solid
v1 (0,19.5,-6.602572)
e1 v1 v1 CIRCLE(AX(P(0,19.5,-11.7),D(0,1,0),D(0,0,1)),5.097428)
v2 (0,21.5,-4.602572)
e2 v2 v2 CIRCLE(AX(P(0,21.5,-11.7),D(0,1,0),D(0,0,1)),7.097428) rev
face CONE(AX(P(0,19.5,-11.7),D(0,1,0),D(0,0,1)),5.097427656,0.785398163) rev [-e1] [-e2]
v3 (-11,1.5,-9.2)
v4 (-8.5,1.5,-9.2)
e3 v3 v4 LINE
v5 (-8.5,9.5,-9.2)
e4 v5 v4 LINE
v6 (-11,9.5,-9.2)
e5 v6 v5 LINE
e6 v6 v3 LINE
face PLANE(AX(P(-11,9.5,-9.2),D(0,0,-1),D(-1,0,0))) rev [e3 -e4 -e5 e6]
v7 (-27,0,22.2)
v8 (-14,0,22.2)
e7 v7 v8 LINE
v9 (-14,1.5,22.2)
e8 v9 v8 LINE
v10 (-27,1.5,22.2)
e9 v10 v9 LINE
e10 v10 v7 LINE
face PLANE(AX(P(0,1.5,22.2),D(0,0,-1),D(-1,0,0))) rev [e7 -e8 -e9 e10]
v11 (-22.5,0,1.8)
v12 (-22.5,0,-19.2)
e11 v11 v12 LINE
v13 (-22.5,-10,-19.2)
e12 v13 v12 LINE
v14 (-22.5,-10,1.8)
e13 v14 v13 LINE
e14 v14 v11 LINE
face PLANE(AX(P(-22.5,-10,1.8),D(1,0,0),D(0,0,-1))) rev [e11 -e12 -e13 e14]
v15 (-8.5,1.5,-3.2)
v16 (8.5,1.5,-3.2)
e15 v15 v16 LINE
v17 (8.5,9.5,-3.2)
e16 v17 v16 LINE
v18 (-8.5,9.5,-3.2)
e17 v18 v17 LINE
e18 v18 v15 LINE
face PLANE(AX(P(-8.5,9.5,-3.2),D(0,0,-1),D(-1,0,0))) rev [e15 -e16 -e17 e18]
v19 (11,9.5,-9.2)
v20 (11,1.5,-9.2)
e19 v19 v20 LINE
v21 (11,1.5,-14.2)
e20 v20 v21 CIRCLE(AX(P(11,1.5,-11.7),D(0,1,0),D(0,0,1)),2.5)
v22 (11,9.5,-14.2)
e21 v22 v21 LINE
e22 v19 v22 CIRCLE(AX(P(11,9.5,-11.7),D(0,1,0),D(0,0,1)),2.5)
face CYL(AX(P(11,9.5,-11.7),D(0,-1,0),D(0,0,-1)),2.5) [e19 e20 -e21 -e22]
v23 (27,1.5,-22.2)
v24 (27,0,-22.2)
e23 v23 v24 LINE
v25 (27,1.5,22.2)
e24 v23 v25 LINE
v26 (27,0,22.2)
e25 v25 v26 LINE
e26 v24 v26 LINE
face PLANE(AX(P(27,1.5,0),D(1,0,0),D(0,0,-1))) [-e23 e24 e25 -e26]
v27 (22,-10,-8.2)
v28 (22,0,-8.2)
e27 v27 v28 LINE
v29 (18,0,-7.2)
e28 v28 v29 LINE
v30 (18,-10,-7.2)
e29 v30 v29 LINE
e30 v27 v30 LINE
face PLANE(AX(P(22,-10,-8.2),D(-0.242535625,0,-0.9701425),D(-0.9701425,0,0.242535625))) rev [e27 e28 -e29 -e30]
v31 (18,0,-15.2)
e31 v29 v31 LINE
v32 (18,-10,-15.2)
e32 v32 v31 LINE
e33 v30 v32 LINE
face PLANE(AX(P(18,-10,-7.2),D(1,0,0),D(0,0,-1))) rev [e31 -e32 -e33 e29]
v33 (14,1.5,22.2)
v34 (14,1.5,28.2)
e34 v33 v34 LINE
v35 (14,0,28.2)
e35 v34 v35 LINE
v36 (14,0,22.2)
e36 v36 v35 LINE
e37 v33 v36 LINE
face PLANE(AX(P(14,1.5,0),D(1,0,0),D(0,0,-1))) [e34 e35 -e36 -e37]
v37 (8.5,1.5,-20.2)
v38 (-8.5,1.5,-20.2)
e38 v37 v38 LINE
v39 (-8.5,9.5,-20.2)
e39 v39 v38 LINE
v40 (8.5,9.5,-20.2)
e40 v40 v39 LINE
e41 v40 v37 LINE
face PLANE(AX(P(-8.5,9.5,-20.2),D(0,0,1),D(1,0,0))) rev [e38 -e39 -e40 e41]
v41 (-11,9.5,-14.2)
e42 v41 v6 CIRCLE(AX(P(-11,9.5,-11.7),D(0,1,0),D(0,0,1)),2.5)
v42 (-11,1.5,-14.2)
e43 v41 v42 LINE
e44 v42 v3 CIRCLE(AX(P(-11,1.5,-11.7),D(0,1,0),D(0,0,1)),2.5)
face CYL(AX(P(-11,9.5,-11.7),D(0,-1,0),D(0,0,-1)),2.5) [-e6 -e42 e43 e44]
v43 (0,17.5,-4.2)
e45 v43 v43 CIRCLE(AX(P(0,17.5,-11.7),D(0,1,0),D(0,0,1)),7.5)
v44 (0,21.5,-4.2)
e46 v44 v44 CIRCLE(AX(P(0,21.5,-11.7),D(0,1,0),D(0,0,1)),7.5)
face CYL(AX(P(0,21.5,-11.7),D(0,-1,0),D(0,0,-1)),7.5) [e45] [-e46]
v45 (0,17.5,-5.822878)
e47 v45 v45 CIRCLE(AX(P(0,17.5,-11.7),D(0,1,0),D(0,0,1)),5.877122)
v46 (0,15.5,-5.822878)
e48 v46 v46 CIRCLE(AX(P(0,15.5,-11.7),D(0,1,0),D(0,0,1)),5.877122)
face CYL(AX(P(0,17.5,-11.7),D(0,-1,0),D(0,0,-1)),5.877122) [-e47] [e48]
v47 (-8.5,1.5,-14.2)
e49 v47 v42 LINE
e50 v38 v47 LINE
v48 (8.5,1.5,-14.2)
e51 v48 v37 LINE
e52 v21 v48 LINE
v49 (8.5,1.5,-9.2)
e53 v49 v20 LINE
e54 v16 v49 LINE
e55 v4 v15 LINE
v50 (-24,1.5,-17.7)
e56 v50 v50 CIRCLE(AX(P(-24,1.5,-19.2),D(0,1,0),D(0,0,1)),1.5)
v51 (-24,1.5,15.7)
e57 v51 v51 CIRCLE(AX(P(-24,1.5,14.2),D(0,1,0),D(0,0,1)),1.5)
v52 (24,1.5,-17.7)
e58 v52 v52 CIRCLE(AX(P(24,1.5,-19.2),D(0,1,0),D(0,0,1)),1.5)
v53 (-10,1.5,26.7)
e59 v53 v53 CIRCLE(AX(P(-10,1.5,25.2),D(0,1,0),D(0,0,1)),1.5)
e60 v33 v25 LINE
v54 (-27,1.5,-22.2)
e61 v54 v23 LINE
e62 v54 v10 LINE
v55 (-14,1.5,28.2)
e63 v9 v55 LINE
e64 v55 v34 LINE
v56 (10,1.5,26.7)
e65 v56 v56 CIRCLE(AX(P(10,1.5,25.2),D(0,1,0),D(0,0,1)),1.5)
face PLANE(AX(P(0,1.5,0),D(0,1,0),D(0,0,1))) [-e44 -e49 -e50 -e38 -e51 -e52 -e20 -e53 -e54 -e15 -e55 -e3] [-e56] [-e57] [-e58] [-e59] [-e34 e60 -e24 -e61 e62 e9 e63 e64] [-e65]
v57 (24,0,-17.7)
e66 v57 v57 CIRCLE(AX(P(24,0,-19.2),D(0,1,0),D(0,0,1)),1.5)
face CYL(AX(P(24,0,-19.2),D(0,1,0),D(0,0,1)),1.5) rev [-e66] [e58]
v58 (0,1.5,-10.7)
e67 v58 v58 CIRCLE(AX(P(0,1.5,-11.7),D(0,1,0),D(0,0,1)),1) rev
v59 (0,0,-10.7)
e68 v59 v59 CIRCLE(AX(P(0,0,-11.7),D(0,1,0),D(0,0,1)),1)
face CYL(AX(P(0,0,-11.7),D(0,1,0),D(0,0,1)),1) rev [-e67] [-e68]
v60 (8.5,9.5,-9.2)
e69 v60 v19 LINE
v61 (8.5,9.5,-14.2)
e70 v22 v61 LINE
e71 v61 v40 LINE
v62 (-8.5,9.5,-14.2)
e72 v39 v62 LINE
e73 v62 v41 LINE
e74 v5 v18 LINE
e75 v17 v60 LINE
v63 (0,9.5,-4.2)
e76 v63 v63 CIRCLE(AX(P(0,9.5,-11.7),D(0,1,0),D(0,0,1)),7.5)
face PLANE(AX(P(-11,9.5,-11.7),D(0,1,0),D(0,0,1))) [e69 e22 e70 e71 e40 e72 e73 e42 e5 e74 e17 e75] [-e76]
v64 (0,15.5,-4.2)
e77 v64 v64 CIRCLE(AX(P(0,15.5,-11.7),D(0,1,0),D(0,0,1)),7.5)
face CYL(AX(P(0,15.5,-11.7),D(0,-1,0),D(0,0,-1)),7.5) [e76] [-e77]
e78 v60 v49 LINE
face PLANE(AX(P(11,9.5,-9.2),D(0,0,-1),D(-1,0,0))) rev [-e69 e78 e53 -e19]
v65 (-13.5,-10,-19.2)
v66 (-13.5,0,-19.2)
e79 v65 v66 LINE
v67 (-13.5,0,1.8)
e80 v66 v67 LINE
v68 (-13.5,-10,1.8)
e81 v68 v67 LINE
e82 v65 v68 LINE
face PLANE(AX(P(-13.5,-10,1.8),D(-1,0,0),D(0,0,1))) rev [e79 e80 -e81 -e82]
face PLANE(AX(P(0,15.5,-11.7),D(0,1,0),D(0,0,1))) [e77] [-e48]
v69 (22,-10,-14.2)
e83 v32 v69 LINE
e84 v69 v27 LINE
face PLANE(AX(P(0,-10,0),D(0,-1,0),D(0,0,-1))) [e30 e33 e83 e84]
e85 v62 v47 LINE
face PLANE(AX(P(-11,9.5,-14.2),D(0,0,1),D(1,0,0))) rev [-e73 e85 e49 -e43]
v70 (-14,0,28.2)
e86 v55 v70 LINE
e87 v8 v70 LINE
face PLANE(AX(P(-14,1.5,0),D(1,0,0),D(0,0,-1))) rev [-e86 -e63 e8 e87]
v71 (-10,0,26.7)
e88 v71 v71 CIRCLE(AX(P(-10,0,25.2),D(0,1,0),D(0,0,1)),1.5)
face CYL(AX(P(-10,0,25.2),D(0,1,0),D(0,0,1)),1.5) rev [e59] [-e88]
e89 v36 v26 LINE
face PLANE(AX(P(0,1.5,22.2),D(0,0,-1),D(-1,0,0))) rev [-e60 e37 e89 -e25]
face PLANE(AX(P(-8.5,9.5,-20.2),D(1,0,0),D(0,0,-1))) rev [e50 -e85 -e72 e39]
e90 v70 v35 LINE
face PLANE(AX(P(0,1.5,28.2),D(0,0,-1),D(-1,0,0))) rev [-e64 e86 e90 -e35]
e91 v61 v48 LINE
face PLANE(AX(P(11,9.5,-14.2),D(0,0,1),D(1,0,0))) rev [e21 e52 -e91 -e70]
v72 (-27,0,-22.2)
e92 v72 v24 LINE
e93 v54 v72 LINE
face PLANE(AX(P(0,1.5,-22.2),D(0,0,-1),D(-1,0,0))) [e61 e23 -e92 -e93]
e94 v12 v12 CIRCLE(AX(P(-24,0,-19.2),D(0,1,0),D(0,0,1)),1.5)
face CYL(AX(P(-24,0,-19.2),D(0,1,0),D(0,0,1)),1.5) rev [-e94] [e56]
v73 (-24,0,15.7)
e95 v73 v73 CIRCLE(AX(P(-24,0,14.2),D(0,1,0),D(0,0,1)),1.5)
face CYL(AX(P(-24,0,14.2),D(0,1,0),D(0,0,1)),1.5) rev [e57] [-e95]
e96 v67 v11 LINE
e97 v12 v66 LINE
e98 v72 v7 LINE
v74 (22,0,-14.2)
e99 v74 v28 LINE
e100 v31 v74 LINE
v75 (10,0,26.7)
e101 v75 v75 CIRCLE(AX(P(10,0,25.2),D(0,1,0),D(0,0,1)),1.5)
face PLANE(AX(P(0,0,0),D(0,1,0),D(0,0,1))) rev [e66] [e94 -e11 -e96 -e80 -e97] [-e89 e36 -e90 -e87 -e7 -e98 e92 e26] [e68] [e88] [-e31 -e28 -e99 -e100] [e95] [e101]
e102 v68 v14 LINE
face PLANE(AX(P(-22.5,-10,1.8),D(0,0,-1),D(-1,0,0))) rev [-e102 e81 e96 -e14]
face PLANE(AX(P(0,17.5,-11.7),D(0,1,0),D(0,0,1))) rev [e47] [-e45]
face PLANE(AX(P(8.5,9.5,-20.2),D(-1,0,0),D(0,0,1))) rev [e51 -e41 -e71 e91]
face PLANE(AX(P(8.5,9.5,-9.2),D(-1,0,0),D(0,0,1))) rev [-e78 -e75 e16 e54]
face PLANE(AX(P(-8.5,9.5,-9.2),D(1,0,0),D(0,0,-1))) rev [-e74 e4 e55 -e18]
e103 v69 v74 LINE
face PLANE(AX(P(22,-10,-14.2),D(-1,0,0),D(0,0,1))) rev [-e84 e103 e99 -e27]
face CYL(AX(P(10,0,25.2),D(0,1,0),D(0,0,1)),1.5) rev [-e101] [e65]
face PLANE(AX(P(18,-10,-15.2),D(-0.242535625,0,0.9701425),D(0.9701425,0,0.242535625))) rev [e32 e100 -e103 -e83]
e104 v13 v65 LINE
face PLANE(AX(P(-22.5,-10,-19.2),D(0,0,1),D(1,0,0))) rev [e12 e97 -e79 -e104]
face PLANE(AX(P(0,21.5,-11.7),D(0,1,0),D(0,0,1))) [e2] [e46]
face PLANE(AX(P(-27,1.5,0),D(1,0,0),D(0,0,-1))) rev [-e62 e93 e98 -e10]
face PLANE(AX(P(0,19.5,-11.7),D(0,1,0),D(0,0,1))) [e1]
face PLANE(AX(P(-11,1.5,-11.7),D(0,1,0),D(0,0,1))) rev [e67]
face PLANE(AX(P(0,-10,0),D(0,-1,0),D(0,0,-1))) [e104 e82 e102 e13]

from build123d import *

# Parameters (mm, degrees)
SKETCH1_W           = 54
SKETCH1_H           = 44.4
SKETCH1_W_2         = 28
SKETCH1_H_2         = 6
BOSS_EXTRUDE1_DEPTH = 1.5
SKETCH2_R           = 1.5
SKETCH2_R_2         = 1
CUT_EXTRUDE1_DEPTH  = 1.5
BOSS_EXTRUDE2_DEPTH = 8
SKETCH4_R           = 7.5
BOSS_EXTRUDE3_DEPTH = 6
SKETCH5_R           = 5.877121991
BOSS_EXTRUDE4_DEPTH = 2
SKETCH6_R           = 7.5
BOSS_EXTRUDE5_DEPTH = 4
SKETCH7_R           = 5.097427656
CUT_EXTRUDE3_DEPTH  = 2
CHAMFER1_SIZE       = 2
BOSS_EXTRUDE6_DEPTH = 10
SKETCH9_W           = 9
SKETCH9_H           = 21
BOSS_EXTRUDE7_DEPTH = 10


with BuildPart() as part:
    # Sketch1 → Boss-Extrude1 (new body)
    with BuildSketch(Plane(origin=(0, 0, 0), x_dir=(1, 0, 0), z_dir=(0, 1, 0))):
        Rectangle(SKETCH1_W, SKETCH1_H)
        with Locations((0, -25.2)):
            Rectangle(SKETCH1_W_2, SKETCH1_H_2)
    extrude(amount=BOSS_EXTRUDE1_DEPTH)

    # Sketch2 → Cut-Extrude1 (cut)
    with BuildSketch(Plane(origin=(0, 1.5, 0), x_dir=(1, 0, 0), z_dir=(0, 1, 0))):
        with Locations(Location((-24, 19.2, 0), (0, 0, 270))):
            Circle(SKETCH2_R)
        with Locations(Location((24, 19.2, 0), (0, 0, 270))):
            Circle(SKETCH2_R)
        with Locations(Location((-24, -14.2, 0), (0, 0, 270))):
            Circle(SKETCH2_R)
        with Locations(Location((-10, -25.2, 0), (0, 0, 270))):
            Circle(SKETCH2_R)
        with Locations(Location((10, -25.2, 0), (0, 0, 270))):
            Circle(SKETCH2_R)
        with Locations(Location((0, 11.7, 0), (0, 0, 270))):
            Circle(SKETCH2_R_2)
    extrude(amount=-CUT_EXTRUDE1_DEPTH, mode=Mode.SUBTRACT)

    # Sketch3 → Boss-Extrude2 (add)
    with BuildSketch(Plane(origin=(0, 1.5, 0), x_dir=(1, 0, 0), z_dir=(0, 1, 0))):
        with BuildLine():
            Line((-8.5, 20.2), (8.5, 20.2))
            Line((8.5, 20.2), (8.5, 14.2))
            Line((8.5, 14.2), (11, 14.2))
            ThreePointArc((11, 14.2), (13.5, 11.7), (11, 9.2))
            Line((11, 9.2), (8.5, 9.2))
            Line((8.5, 9.2), (8.5, 3.2))
            Line((8.5, 3.2), (-8.5, 3.2))
            Line((-8.5, 3.2), (-8.5, 9.2))
            Line((-8.5, 9.2), (-11, 9.2))
            ThreePointArc((-11, 9.2), (-13.5, 11.7), (-11, 14.2))
            Line((-11, 14.2), (-8.5, 14.2))
            Line((-8.5, 14.2), (-8.5, 20.2))
        make_face()
    extrude(amount=BOSS_EXTRUDE2_DEPTH)

    # Sketch4 → Boss-Extrude3 (add)
    with BuildSketch(Plane(origin=(0, 9.5, 0), x_dir=(1, 0, 0), z_dir=(0, 1, 0))):
        with Locations(Location((0, 11.7, 0), (0, 0, 270))):
            Circle(SKETCH4_R)
    extrude(amount=BOSS_EXTRUDE3_DEPTH)

    # Sketch5 → Boss-Extrude4 (add)
    with BuildSketch(Plane(origin=(0, 15.5, 0), x_dir=(1, 0, 0), z_dir=(0, 1, 0))):
        with Locations(Location((0, 11.7, 0), (0, 0, 270))):
            Circle(SKETCH5_R)
    extrude(amount=BOSS_EXTRUDE4_DEPTH)

    # Sketch6 → Boss-Extrude5 (add)
    with BuildSketch(Plane(origin=(0, 17.5, 0), x_dir=(1, 0, 0), z_dir=(0, 1, 0))):
        with Locations(Location((0, 11.7, 0), (0, 0, 270))):
            Circle(SKETCH6_R)
    extrude(amount=BOSS_EXTRUDE5_DEPTH)

    # Sketch7 → Cut-Extrude3 (cut)
    with BuildSketch(Plane(origin=(0, 21.5, 0), x_dir=(1, 0, 0), z_dir=(0, 1, 0))):
        with Locations(Location((0, 11.7, 0), (0, 0, 270))):
            Circle(SKETCH7_R)
    extrude(amount=-CUT_EXTRUDE3_DEPTH, mode=Mode.SUBTRACT)

    # Chamfer1
    chamfer1_edges = [part.edges().sort_by_distance(p)[0] for p in [
        (0, 21.5, -16.797427656),
    ]]
    chamfer(chamfer1_edges, length=CHAMFER1_SIZE - 0.0001)  # a hair under: the kernel refuses the full size

    # Sketch8 → Boss-Extrude6 (add)
    with BuildSketch(Plane.XZ):
        Polygon((18, -7.2), (18, -15.2), (22, -14.2), (22, -8.2), align=None)
    extrude(amount=BOSS_EXTRUDE6_DEPTH)

    # Sketch9 → Boss-Extrude7 (add)
    with BuildSketch(Plane.XZ):
        with Locations((-18, -8.7)):
            Rectangle(SKETCH9_W, SKETCH9_H)
    extrude(amount=BOSS_EXTRUDE7_DEPTH)


solid = part.part
